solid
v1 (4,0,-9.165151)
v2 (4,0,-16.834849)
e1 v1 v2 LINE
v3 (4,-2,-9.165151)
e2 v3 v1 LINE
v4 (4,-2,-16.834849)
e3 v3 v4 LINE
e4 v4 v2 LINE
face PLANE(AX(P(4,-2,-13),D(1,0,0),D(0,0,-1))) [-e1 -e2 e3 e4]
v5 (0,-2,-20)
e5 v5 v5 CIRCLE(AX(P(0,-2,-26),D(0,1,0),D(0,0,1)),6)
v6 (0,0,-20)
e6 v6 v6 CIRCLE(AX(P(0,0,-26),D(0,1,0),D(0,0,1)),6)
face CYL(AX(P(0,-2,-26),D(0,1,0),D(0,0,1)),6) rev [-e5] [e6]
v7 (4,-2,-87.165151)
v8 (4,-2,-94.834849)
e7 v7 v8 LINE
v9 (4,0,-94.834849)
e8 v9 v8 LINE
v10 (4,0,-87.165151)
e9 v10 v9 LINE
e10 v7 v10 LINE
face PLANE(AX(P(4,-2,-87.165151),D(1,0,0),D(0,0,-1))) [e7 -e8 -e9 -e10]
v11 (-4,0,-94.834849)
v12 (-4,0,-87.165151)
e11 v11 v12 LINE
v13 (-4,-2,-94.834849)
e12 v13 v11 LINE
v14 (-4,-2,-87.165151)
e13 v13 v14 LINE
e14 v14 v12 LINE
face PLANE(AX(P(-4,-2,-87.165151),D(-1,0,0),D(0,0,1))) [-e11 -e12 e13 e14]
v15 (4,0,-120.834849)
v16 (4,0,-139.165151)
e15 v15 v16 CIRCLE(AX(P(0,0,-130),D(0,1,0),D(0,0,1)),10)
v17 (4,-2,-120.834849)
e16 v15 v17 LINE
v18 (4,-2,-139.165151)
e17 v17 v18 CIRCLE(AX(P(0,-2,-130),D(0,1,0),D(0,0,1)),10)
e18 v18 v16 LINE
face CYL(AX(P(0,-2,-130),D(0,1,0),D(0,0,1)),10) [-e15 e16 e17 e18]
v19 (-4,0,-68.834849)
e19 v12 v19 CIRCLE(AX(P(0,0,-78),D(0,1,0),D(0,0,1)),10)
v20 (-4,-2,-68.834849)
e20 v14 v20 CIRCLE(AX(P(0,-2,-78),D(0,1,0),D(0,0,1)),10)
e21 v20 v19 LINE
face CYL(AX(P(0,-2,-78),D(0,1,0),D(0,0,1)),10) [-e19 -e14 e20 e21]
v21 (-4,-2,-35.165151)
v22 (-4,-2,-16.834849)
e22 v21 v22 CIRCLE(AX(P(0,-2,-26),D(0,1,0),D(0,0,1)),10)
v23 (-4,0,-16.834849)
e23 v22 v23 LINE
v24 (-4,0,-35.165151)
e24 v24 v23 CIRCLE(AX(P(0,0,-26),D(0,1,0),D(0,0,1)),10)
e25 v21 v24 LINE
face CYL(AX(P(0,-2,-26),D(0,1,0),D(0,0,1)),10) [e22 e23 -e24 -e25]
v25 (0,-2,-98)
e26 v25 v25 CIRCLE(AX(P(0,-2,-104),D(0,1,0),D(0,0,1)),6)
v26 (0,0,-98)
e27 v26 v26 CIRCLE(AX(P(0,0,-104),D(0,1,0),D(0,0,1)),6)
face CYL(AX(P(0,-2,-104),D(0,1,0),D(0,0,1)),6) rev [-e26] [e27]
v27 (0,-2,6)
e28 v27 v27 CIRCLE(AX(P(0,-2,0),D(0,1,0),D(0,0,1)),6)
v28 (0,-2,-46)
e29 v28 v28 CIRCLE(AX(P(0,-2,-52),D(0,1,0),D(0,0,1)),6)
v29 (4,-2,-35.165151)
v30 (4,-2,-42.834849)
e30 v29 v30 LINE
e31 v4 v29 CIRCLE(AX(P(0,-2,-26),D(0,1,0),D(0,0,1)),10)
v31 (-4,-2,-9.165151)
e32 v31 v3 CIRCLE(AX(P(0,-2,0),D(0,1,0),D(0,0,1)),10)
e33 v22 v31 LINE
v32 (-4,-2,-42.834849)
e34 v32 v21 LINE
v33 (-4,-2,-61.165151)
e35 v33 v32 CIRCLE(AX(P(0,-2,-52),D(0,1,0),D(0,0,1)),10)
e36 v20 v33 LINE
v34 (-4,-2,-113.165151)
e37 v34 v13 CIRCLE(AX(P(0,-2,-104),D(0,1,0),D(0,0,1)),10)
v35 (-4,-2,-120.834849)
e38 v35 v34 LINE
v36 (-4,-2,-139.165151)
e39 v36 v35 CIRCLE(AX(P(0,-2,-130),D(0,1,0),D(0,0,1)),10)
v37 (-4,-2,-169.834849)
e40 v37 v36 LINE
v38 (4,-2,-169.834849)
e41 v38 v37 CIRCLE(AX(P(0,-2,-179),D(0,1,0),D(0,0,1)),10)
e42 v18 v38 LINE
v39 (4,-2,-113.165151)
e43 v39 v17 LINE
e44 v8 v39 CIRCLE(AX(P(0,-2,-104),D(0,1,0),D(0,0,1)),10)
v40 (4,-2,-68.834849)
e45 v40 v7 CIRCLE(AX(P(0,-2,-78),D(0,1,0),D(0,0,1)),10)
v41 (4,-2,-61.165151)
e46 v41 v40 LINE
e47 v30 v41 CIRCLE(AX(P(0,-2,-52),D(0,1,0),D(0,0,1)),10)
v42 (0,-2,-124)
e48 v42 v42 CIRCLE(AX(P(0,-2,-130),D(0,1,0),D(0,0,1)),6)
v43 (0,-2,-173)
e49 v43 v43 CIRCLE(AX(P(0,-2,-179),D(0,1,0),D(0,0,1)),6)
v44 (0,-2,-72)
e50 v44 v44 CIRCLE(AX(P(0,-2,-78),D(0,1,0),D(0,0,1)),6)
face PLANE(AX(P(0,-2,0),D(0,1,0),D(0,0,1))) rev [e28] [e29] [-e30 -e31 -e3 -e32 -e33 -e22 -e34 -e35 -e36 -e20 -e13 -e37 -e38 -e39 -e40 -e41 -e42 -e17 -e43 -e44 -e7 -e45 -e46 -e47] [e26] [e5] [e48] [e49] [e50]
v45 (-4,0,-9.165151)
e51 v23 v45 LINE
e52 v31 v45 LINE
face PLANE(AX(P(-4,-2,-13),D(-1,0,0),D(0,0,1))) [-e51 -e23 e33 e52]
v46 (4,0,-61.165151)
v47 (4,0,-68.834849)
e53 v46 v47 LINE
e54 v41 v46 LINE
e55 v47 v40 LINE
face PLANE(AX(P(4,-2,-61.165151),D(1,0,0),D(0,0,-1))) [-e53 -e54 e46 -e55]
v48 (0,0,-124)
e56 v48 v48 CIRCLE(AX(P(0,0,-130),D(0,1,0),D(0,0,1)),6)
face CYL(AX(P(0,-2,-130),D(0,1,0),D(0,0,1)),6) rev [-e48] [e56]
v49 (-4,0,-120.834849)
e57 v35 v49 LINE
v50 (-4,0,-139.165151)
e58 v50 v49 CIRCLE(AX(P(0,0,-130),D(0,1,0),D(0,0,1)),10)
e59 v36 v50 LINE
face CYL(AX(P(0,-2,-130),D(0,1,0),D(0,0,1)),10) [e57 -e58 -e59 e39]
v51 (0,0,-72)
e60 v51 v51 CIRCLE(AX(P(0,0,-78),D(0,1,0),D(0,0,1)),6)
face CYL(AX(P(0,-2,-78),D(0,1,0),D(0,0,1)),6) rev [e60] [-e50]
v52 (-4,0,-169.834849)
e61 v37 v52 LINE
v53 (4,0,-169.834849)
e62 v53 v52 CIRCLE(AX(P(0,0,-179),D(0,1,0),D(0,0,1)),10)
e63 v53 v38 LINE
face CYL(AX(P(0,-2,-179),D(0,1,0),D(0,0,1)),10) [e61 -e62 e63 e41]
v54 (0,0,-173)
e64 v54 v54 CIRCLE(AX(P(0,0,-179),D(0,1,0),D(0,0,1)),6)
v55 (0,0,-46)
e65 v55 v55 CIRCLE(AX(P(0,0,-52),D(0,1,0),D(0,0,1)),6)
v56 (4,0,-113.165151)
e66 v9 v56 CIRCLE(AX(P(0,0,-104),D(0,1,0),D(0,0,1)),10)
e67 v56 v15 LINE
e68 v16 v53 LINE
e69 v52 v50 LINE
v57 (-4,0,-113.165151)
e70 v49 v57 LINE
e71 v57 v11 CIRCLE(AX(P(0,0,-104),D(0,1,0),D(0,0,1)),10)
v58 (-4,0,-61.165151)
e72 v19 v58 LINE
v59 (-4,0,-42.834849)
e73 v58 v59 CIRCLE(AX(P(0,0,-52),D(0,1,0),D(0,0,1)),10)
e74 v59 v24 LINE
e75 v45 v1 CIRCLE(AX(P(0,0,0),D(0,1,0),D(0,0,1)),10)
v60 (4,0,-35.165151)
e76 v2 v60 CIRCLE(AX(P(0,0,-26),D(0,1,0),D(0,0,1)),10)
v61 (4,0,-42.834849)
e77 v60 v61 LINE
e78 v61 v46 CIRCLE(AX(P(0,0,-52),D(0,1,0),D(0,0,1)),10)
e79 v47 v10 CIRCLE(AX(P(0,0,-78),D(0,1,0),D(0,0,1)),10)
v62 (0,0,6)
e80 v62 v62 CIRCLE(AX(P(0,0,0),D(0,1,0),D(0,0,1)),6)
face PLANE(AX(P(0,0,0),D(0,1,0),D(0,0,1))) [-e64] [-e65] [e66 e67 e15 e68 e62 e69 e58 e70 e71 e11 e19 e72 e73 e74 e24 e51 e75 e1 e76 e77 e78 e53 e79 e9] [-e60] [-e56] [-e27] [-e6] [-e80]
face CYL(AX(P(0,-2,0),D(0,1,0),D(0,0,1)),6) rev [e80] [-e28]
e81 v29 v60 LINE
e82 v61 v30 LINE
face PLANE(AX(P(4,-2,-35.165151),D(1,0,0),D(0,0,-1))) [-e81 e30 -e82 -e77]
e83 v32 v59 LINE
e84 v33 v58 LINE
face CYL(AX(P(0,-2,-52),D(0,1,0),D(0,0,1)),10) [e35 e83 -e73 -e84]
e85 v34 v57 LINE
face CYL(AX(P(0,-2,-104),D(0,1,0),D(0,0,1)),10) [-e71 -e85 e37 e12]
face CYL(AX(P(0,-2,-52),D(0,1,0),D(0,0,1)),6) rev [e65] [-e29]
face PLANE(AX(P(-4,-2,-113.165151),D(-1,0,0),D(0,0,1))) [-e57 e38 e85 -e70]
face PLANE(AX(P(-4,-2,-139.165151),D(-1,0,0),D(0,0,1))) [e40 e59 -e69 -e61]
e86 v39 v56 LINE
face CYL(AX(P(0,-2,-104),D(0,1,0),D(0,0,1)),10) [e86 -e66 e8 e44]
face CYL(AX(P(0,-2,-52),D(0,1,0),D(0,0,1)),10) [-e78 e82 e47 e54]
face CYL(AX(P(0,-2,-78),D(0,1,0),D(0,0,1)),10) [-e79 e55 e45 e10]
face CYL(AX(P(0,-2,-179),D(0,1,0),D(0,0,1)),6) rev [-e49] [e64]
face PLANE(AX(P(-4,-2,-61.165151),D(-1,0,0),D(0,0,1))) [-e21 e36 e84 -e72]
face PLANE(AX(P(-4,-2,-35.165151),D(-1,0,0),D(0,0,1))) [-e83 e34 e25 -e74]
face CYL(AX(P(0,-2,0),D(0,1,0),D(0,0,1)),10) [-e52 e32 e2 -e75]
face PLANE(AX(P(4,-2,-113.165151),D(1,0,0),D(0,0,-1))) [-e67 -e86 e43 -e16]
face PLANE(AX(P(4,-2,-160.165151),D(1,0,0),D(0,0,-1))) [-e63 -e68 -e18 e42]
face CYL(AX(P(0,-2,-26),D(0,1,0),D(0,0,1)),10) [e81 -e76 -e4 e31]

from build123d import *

# Parameters (mm, degrees)
SKETCH1_R             = 10
BASE_FLANGE1_DEPTH    = 2
SKETCH6_R             = 6
CUT_EXTRUDE1_DEPTH    = 15.282856857
SKETCH8_R             = 10
BASE_FLANGE2_DEPTH    = 2
SKETCH11_R            = 6
CUT_EXTRUDE2_DEPTH    = 38.416573868
SKETCH13_W            = 8
SKETCH13_H            = 3.83484861
TAB1_DEPTH            = 2
SKETCH16_W            = 8
SKETCH16_H            = 3.83484861
TAB2_DEPTH            = 2
SKETCH33_R            = 10
BOSS_EXTRUDE2_DEPTH   = 2
BOSS_EXTRUDE2_2_DEPTH = 2
BOSS_EXTRUDE2_3_DEPTH = 2
BOSS_EXTRUDE2_4_DEPTH = 2
BOSS_EXTRUDE2_5_DEPTH = 2
SKETCH23_W            = 8
SKETCH23_H            = 7.778071864
BOSS_EXTRUDE3_DEPTH   = 2
SKETCH41_R            = 6
CUT_EXTRUDE3_DEPTH    = 2


# Sheet-metal steps are written as plain solids
with BuildPart() as part:
    # Sketch1 → Base-Flange1 (new body)
    with BuildSketch(Plane(origin=(0, 0, 0), x_dir=(1, 0, 0), z_dir=(0, 1, 0))):
        with Locations(Location((0, 0, 0), (0, 0, 270))):
            Circle(SKETCH1_R)
    extrude(amount=-BASE_FLANGE1_DEPTH)

    # Sketch6 → Cut-Extrude1 (cut, through all)
    with BuildSketch(Plane(origin=(0, 0, 0), x_dir=(1, 0, 0), z_dir=(0, 1, 0))):
        with Locations(Location((0, 0, 0), (0, 0, 270))):
            Circle(SKETCH6_R)
    extrude(amount=-CUT_EXTRUDE1_DEPTH, mode=Mode.SUBTRACT)

    # Sketch13 → Tab1 (add)
    with BuildSketch(Plane(origin=(0, 0, 0), x_dir=(1, 0, 0), z_dir=(0, 1, 0))):
        with Locations((0, 11.082575695)):
            Rectangle(SKETCH13_W, SKETCH13_H)
    extrude(amount=-TAB1_DEPTH)



with BuildPart() as body_2:
    # Sketch8 → Base-Flange2 (new body)
    with BuildSketch(Plane(origin=(0, 0, 0), x_dir=(1, 0, 0), z_dir=(0, 1, 0))):
        with Locations(Location((0, 26, 0), (0, 0, 270))):
            Circle(SKETCH8_R)
    extrude(amount=-BASE_FLANGE2_DEPTH)

    # Sketch11 → Cut-Extrude2 (cut, through all)
    with BuildSketch(Plane(origin=(0, 0, 0), x_dir=(1, 0, 0), z_dir=(0, 1, 0))):
        with Locations(Location((0, 26, 0), (0, 0, 270))):
            Circle(SKETCH11_R)
    extrude(amount=-CUT_EXTRUDE2_DEPTH, mode=Mode.SUBTRACT)


with BuildPart() as part_1:
    add(part.part)

    add(body_2.part)  # Tab2 merges body 2
    # Sketch16 → Tab2 (add)
    with BuildSketch(Plane(origin=(0, 0, 0), x_dir=(1, 0, 0), z_dir=(0, 1, 0))):
        with Locations((0, 14.917424305)):
            Rectangle(SKETCH16_W, SKETCH16_H)
    extrude(amount=-TAB2_DEPTH)



with BuildPart() as body_2_2:
    # Sketch33 → Boss-Extrude2 (new body)
    with BuildSketch(Plane(origin=(0, 0, 0), x_dir=(1, 0, 0), z_dir=(0, 1, 0))):
        with Locations(Location((0, 52, 0), (0, 0, 270))):
            Circle(SKETCH33_R)
    extrude(amount=-BOSS_EXTRUDE2_DEPTH)


with BuildPart() as body_3:
    # Sketch33 → Boss-Extrude2 2 (new body)
    with BuildSketch(Plane(origin=(0, 0, 0), x_dir=(1, 0, 0), z_dir=(0, 1, 0))):
        with Locations(Location((0, 78, 0), (0, 0, 270))):
            Circle(SKETCH33_R)
    extrude(amount=-BOSS_EXTRUDE2_2_DEPTH)


with BuildPart() as body_4:
    # Sketch33 → Boss-Extrude2 3 (new body)
    with BuildSketch(Plane(origin=(0, 0, 0), x_dir=(1, 0, 0), z_dir=(0, 1, 0))):
        with Locations(Location((0, 104, 0), (0, 0, 270))):
            Circle(SKETCH33_R)
    extrude(amount=-BOSS_EXTRUDE2_3_DEPTH)


with BuildPart() as body_5:
    # Sketch33 → Boss-Extrude2 4 (new body)
    with BuildSketch(Plane(origin=(0, 0, 0), x_dir=(1, 0, 0), z_dir=(0, 1, 0))):
        with Locations(Location((0, 130, 0), (0, 0, 270))):
            Circle(SKETCH33_R)
    extrude(amount=-BOSS_EXTRUDE2_4_DEPTH)


with BuildPart() as body_6:
    # Sketch33 → Boss-Extrude2 5 (new body)
    with BuildSketch(Plane(origin=(0, 0, 0), x_dir=(1, 0, 0), z_dir=(0, 1, 0))):
        with Locations(Location((0, 179, 0), (0, 0, 270))):
            Circle(SKETCH33_R)
    extrude(amount=-BOSS_EXTRUDE2_5_DEPTH)


with BuildPart() as part_2:
    add(part_1.part)

    add(body_2_2.part)  # Boss-Extrude3 merges body 2 2

    add(body_3.part)  # Boss-Extrude3 merges body 3

    add(body_4.part)  # Boss-Extrude3 merges body 4

    add(body_5.part)  # Boss-Extrude3 merges body 5

    add(body_6.part)  # Boss-Extrude3 merges body 6
    # Sketch23 → Boss-Extrude3 (add)
    with BuildSketch(Plane(origin=(0, 0, 0), x_dir=(1, 0, 0), z_dir=(0, 1, 0))):
        with Locations((0, 39.054187322)):
            Rectangle(SKETCH23_W, SKETCH23_H)
        with Locations((0, 65.054187322)):
            Rectangle(SKETCH23_W, SKETCH23_H)
        with Locations((0, 91.054187322)):
            Rectangle(SKETCH23_W, SKETCH23_H)
        with Locations((0, 117.054187322)):
            Rectangle(SKETCH23_W, SKETCH23_H)
        Polygon((4, 139.16515139), (4, 146.943223254), (4, 160.16515139), (4, 169.043915681), (4, 173.041429596), (-4, 173.041429596), (-4, 169.043915681), (-4, 160.16515139), (-4, 146.943223254), (-4, 139.16515139), align=None)
    extrude(amount=-BOSS_EXTRUDE3_DEPTH)

    # Sketch41 → Cut-Extrude3 (cut)
    with BuildSketch(Plane(origin=(0, 0, 0), x_dir=(1, 0, 0), z_dir=(0, 1, 0))):
        with Locations(Location((0, 52, 0), (0, 0, 270))):
            Circle(SKETCH41_R)
        with Locations(Location((0, 78, 0), (0, 0, 270))):
            Circle(SKETCH41_R)
        with Locations(Location((0, 104, 0), (0, 0, 270))):
            Circle(SKETCH41_R)
        with Locations(Location((0, 130, 0), (0, 0, 270))):
            Circle(SKETCH41_R)
        with Locations(Location((0, 179, 0), (0, 0, 270))):
            Circle(SKETCH41_R)
    extrude(amount=-CUT_EXTRUDE3_DEPTH, mode=Mode.SUBTRACT)


solid = part_2.part
